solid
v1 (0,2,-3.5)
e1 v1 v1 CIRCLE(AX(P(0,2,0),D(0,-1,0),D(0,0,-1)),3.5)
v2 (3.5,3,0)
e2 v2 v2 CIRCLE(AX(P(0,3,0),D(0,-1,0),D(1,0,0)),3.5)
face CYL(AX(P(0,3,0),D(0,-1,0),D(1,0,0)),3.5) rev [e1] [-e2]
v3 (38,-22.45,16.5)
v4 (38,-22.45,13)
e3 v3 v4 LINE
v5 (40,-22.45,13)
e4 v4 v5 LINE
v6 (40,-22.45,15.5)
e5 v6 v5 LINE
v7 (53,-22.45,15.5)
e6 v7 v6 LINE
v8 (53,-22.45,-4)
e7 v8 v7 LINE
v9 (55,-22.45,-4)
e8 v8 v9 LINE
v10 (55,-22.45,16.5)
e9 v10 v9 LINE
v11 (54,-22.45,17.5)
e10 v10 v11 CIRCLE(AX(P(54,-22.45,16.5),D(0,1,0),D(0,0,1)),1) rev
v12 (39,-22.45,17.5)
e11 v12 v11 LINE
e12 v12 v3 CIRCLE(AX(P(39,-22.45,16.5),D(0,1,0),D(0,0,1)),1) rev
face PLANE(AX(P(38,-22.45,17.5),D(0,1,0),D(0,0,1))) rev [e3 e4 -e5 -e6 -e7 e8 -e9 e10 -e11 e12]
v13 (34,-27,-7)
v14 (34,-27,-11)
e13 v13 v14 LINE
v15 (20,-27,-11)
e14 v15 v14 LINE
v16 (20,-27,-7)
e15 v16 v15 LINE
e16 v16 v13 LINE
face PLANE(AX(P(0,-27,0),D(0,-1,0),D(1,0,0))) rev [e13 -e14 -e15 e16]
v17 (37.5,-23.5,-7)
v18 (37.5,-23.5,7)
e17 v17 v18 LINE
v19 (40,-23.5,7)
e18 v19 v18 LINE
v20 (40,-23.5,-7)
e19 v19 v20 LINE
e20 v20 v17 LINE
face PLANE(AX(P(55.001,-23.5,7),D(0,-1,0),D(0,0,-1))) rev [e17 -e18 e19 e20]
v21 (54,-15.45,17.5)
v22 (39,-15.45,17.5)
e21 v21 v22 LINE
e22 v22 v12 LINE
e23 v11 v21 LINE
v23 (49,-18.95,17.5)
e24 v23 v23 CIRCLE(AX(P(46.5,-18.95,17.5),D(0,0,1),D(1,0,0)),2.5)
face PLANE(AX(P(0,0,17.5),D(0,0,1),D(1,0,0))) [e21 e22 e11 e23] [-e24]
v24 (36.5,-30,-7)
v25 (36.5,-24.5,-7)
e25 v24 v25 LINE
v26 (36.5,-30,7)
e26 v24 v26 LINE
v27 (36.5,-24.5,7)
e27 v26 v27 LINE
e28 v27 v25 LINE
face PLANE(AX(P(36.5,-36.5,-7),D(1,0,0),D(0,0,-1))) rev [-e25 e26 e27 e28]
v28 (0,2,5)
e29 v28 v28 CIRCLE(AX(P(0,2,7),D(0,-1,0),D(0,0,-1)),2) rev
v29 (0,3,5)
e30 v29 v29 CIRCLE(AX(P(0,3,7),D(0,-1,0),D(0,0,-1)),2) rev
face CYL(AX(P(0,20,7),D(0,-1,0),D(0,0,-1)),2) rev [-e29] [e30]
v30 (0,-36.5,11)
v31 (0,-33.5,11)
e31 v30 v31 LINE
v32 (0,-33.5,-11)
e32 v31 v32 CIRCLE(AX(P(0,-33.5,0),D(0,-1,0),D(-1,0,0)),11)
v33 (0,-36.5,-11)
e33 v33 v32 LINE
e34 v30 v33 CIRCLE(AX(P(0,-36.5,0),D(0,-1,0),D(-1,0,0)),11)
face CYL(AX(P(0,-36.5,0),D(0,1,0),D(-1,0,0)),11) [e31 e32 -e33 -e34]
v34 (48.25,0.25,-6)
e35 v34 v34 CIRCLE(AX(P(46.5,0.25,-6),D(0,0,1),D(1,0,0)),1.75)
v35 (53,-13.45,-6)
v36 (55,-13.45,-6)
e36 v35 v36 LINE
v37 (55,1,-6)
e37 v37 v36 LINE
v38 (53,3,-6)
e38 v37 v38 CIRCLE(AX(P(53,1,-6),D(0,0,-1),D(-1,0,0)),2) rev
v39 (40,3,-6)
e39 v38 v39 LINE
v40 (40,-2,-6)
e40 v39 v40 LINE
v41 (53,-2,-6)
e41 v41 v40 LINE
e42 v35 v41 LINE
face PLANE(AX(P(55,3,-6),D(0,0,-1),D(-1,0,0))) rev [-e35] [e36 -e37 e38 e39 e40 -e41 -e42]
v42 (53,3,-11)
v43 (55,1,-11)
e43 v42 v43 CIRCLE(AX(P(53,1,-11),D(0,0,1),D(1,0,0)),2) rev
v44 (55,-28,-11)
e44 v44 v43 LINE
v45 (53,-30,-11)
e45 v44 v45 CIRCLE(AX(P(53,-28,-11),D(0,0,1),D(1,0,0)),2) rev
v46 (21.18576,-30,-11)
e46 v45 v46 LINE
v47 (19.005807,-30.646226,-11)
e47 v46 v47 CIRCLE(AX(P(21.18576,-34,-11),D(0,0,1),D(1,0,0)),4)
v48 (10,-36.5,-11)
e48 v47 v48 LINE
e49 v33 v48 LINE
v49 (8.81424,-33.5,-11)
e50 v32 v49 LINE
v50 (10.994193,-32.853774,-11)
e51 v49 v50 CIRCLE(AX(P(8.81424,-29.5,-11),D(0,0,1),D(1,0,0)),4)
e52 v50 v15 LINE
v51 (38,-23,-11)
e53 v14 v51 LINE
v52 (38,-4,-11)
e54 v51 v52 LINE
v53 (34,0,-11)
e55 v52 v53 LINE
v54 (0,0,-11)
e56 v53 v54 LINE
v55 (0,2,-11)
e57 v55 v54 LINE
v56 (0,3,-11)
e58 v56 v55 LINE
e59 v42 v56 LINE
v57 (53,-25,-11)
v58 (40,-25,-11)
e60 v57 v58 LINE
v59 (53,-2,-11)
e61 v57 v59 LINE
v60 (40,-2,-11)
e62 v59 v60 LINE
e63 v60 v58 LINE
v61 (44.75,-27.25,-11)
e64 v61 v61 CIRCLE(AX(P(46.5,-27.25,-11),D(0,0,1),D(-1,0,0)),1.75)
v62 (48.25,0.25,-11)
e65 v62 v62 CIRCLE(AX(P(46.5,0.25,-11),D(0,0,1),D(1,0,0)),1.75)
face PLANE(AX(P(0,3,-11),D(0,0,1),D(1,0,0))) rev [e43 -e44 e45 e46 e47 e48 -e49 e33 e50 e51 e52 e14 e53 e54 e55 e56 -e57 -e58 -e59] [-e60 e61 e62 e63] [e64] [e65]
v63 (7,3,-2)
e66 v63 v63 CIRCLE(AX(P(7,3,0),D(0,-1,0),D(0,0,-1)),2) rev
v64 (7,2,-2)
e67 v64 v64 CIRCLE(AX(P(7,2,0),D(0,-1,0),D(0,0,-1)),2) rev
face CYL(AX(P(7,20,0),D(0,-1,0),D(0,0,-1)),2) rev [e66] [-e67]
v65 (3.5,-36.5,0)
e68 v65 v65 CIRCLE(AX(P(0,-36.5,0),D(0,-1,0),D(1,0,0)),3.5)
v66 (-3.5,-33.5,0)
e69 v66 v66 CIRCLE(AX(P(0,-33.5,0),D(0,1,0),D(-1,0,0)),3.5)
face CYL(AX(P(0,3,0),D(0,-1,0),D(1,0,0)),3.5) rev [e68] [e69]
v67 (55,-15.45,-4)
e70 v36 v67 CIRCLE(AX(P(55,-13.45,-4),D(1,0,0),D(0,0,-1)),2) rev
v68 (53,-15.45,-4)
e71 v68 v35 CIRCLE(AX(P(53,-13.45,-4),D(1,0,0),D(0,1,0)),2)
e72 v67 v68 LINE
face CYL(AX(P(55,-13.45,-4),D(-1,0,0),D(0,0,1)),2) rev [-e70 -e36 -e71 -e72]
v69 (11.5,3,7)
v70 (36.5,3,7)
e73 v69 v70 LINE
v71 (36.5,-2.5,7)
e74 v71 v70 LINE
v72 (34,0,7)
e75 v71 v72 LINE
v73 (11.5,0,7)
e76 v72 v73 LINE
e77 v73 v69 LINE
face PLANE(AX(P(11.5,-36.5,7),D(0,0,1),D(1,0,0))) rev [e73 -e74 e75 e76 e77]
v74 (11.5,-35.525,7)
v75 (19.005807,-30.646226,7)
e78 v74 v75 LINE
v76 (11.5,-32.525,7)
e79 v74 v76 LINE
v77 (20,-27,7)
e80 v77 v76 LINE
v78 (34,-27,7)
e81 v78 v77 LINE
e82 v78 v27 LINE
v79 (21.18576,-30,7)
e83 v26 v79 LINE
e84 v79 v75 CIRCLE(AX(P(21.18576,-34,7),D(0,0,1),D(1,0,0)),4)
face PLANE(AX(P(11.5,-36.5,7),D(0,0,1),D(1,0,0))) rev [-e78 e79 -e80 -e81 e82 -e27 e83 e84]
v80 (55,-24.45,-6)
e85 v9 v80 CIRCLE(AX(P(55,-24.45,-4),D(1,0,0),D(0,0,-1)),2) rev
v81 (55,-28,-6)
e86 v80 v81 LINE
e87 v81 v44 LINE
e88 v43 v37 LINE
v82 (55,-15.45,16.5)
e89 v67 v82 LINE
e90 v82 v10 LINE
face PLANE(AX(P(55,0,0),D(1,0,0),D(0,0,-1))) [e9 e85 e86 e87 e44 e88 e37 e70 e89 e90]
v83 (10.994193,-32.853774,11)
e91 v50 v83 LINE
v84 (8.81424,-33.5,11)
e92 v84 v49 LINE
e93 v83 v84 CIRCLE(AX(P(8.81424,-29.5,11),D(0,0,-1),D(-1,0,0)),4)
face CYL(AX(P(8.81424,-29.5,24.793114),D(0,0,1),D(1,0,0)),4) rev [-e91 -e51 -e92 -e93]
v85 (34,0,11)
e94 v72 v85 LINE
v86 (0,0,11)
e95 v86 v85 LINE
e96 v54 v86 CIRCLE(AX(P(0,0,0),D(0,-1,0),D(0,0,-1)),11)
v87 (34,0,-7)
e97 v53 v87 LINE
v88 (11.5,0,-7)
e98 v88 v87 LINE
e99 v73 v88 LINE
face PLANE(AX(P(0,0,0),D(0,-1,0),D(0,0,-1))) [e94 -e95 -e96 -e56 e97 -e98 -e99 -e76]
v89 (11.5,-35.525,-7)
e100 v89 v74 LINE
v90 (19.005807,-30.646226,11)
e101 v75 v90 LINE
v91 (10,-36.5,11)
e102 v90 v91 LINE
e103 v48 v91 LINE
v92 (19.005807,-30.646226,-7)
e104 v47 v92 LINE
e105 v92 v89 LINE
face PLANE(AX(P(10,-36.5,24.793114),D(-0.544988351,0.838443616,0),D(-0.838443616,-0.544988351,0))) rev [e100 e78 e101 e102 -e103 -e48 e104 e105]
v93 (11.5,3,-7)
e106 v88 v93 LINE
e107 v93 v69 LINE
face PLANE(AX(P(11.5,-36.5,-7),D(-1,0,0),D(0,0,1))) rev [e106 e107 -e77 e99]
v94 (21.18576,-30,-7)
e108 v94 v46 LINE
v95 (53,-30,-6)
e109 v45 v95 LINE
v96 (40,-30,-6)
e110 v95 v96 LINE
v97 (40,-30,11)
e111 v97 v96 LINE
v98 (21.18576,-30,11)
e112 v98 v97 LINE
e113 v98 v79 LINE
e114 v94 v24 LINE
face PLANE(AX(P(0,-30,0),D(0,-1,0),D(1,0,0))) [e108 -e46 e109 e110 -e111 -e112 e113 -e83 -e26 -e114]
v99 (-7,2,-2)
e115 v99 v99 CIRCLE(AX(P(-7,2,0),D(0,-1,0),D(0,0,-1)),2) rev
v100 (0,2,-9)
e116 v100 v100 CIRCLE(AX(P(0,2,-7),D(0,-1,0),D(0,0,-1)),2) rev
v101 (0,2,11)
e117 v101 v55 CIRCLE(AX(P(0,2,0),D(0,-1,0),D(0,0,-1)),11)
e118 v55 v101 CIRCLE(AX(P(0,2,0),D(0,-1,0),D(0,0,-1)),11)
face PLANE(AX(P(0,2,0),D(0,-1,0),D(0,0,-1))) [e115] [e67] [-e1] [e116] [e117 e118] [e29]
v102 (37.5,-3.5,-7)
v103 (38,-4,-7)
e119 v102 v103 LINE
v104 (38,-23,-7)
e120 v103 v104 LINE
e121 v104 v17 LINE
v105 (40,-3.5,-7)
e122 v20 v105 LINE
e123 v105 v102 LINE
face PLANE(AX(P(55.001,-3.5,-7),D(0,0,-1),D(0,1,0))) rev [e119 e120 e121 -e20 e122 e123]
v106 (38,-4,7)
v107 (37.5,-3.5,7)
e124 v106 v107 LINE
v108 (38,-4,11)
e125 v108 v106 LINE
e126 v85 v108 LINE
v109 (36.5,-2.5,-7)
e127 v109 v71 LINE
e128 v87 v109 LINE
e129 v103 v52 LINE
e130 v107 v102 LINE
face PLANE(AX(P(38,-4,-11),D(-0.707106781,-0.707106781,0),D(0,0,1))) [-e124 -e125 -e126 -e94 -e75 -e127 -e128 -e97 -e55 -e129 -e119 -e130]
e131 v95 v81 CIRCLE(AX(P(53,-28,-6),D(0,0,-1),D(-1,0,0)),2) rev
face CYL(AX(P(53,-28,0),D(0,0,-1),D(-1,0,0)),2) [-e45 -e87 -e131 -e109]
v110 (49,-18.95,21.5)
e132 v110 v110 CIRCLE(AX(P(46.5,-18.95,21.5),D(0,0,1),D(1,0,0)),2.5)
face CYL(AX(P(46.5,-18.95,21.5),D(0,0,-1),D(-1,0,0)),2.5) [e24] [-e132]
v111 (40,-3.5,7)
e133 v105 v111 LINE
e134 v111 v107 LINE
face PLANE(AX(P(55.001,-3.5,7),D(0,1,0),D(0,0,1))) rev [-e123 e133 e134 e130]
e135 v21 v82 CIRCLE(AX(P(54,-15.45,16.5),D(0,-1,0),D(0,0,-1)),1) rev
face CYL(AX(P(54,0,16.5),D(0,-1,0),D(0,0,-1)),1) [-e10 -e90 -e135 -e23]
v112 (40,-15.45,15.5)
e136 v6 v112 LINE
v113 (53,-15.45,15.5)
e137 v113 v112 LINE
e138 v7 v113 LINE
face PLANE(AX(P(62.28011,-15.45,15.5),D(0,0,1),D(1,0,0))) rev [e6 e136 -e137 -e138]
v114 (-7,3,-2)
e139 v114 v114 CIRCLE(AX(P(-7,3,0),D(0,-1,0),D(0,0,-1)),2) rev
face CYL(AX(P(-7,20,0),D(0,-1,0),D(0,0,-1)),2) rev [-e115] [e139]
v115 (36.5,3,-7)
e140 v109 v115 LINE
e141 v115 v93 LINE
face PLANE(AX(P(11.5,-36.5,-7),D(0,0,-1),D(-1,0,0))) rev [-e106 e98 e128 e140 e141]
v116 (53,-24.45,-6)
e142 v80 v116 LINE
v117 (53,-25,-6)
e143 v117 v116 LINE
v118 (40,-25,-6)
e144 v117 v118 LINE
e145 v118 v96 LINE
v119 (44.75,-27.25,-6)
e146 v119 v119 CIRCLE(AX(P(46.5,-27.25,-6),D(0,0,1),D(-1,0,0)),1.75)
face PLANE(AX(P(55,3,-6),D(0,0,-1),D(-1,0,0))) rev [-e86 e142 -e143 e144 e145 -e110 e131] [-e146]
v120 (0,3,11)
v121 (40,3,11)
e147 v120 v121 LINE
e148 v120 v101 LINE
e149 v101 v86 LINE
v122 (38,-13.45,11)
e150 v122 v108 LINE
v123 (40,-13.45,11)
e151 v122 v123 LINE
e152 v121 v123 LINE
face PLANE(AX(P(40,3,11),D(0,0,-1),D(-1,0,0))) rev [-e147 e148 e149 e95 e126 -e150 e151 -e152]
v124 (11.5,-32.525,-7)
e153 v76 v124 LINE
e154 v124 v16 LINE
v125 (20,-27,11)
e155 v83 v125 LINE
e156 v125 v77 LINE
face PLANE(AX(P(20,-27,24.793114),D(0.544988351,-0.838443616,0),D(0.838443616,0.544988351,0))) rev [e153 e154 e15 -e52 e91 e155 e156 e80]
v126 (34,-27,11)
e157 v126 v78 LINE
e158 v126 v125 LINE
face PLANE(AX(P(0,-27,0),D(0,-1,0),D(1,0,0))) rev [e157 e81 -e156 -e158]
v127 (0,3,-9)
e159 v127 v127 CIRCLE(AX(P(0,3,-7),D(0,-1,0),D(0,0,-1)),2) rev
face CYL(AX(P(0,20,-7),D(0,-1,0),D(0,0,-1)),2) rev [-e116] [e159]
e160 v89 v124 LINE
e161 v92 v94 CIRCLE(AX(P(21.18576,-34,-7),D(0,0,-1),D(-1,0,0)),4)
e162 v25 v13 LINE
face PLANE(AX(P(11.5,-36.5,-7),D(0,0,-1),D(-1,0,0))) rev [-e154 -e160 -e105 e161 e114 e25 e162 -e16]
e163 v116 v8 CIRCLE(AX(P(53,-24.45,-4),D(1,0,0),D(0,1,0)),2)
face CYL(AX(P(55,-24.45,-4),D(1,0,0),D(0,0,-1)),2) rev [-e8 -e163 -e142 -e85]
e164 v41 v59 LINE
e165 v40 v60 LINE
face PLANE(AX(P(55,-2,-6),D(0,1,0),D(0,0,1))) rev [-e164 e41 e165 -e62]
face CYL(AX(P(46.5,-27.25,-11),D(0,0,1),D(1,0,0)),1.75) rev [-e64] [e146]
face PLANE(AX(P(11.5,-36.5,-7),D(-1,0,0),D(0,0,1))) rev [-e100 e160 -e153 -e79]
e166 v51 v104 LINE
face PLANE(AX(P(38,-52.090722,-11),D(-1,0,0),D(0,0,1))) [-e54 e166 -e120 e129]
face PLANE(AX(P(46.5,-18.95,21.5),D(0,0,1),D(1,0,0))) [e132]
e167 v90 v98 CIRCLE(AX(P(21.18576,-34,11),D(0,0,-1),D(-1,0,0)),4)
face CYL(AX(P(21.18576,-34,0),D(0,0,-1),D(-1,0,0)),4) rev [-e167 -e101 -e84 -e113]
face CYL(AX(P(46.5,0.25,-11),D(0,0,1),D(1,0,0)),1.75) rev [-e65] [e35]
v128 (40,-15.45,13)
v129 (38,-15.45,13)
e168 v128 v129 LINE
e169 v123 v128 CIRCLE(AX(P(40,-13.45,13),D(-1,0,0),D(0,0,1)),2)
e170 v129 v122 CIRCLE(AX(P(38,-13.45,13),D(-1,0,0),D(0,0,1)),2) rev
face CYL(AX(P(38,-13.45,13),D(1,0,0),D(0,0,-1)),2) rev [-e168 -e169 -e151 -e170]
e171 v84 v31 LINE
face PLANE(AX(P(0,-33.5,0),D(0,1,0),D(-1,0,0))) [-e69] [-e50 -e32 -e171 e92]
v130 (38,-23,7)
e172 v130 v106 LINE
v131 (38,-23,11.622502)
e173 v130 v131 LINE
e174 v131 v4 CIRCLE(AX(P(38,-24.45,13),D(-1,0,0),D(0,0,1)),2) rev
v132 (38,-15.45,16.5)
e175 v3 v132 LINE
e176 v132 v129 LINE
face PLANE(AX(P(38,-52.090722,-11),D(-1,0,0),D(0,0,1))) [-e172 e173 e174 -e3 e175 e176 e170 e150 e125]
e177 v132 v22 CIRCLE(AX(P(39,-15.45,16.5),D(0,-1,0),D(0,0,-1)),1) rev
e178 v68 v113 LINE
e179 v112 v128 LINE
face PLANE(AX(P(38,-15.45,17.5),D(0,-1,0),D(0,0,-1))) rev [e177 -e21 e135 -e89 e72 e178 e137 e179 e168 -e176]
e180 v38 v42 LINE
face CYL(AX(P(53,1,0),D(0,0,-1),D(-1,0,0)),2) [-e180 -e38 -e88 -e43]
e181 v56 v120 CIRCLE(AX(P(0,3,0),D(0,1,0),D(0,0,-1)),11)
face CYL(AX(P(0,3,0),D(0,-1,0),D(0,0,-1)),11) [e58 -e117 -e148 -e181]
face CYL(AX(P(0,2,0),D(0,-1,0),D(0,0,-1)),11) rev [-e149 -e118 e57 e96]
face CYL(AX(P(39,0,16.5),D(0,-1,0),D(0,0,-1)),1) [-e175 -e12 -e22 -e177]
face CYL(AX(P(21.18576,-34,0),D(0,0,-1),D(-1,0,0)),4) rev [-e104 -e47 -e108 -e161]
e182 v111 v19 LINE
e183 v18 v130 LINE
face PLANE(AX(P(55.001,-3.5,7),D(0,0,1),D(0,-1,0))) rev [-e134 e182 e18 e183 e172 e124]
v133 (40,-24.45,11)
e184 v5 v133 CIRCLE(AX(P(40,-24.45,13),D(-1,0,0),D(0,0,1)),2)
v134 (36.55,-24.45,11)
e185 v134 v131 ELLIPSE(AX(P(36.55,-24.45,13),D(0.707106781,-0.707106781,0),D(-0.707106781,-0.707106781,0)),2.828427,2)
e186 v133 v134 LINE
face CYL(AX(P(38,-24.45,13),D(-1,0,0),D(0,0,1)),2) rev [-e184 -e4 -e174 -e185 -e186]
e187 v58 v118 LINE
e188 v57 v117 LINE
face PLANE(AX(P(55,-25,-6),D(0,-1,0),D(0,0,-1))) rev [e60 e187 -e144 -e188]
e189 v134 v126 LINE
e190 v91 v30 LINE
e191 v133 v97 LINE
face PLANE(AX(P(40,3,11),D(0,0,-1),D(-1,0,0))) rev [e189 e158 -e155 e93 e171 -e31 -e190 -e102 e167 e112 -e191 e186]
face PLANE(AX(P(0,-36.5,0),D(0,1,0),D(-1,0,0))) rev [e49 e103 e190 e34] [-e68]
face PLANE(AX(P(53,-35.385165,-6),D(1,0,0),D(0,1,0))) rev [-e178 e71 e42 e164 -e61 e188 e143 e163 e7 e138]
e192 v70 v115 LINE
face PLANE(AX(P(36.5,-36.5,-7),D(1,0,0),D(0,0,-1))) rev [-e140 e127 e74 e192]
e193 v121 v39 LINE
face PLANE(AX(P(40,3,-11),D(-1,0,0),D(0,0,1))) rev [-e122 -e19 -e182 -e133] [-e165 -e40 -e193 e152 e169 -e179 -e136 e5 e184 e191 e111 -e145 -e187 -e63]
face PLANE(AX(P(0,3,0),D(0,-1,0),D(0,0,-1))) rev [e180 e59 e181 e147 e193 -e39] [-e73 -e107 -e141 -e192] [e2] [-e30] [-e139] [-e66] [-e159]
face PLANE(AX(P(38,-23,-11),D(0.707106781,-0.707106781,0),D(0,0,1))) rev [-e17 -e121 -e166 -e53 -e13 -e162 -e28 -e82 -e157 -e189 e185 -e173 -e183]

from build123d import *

# Parameters (mm, degrees)
EXTRUDE_1_DEPTH             = 3
SKETCH_3_R                  = 11
CUT_EXTRUDE_1_DEPTH         = 2
CUT_EXTRUDE_2_DEPTH         = 20
CUT_EXTRUDE_2_DEPTH_BACK    = 42.593268686
SKETCH_1_R                  = 3
SKETCH_1_R_2                = 2
EXTRUDE_2_DEPTH             = 3
SKETCH_5_R                  = 3.5
CUT_EXTRUDE_3_DEPTH         = 58.282196187
SKETCH_8_W                  = 20
SKETCH_8_H                  = 22
EXTRUDE_4_DEPTH             = 3
EXTRUDE_5_REACH             = 57.256
EXTRUDE_5_DIRECTION_2_REACH = 57.256
SKETCH_11_W                 = 5
SKETCH_11_H                 = 5
EXTRUDE_6_DEPTH             = 15
EXTRUDE_6_2_DEPTH           = 15
SKETCH_13_W                 = 2
SKETCH_13_H                 = 22
EXTRUDE_7_DEPTH             = 33
SKETCH_15_W                 = 2
SKETCH_15_H                 = 5
EXTRUDE_8_DEPTH             = 28
SKETCH_14_R                 = 1.75
CUT_EXTRUDE_4_DEPTH         = 69.163406605
SKETCH_16_W                 = 2
SKETCH_16_H                 = 7
EXTRUDE_9_DEPTH             = 6.5
SKETCH_17_W                 = 2
SKETCH_17_H                 = 7
EXTRUDE_10_DEPTH            = 15
SKETCH_18_W                 = 2
SKETCH_18_H                 = 7
EXTRUDE_11_DEPTH            = 21.5
SKETCH_19_R                 = 2.5
EXTRUDE_12_DEPTH            = 4
CUT_EXTRUDE_5_REACH         = 66.773
SKETCH_20_W                 = 14
SKETCH_20_H                 = 20
SKETCH_21_W                 = 25
SKETCH_21_H                 = 14
CUT_EXTRUDE_6_DEPTH         = 72.045759902
CHAMFER_1_SIZE              = 4
FILLET_1_R                  = 4
FILLET_2_R                  = 2
FILLET_3_R                  = 2
FILLET_4_R                  = 1


with BuildPart() as part:
    # 草图2 → 凸台-拉伸1 (new body)
    with BuildSketch(Plane(origin=(0, 0, 0), x_dir=(1, 0, 0), z_dir=(0, 1, 0))):
        with BuildLine():
            Line((0, 11), (40, 11))
            Line((40, 11), (40, -11))
            Line((40, -11), (0, -11))
            ThreePointArc((0, -11), (-11, 0), (0, 11))
        make_face()
    extrude(amount=EXTRUDE_1_DEPTH)

    # 草图3 → 切除-拉伸1 (cut)
    with BuildSketch(Plane(origin=(0, 0, 0), x_dir=(-1, 0, 0), z_dir=(0, -1, 0))):
        Circle(SKETCH_3_R)
    extrude(amount=-CUT_EXTRUDE_1_DEPTH, mode=Mode.SUBTRACT)

    # 草图1 → 切除-拉伸2 (cut, two sides: drawn at the far end of the back side and taken through both)
    with BuildSketch(Plane(origin=(0, 0, 0), x_dir=(1, 0, 0), z_dir=(0, 1, 0)).offset(-CUT_EXTRUDE_2_DEPTH_BACK)):
        with Locations(Location((0, 0, 0), (0, 0, 90))):
            Circle(SKETCH_1_R)
        with Locations(Location((-7, 0, 0), (0, 0, 90))):
            Circle(SKETCH_1_R_2)
        with Locations(Location((0, 7, 0), (0, 0, 90))):
            Circle(SKETCH_1_R_2)
        with Locations(Location((7, 0, 0), (0, 0, 90))):
            Circle(SKETCH_1_R_2)
        with Locations(Location((0, -7, 0), (0, 0, 90))):
            Circle(SKETCH_1_R_2)
    extrude(amount=CUT_EXTRUDE_2_DEPTH + CUT_EXTRUDE_2_DEPTH_BACK, mode=Mode.SUBTRACT)


with BuildPart() as body_2:
    # 草图4 → 凸台-拉伸2 (new body)
    with BuildSketch(Plane(origin=(0, -33.5, 0), x_dir=(-1, 0, 0), z_dir=(0, -1, 0))):
        with BuildLine():
            Line((0, 11), (-10, 11))
            Line((-10, 11), (-10, -11))
            Line((-10, -11), (0, -11))
            ThreePointArc((0, -11), (11, 0), (0, 11))
        make_face()
    extrude(amount=EXTRUDE_2_DEPTH)


with BuildPart() as cut_extrude_3_tool:
    # 草图5 → 切除-拉伸3 (new, through all)
    with BuildSketch(Plane(origin=(0, -36.5, 0), x_dir=(-1, 0, 0), z_dir=(0, -1, 0))):
        with Locations(Location((0, 0, 0), (0, 0, 180))):
            Circle(SKETCH_5_R)
    extrude(amount=-CUT_EXTRUDE_3_DEPTH)


with BuildPart() as part_1:
    add(part.part)

    # 切除-拉伸3: cut by cut_extrude_3_tool
    add(cut_extrude_3_tool.part, mode=Mode.SUBTRACT)



with BuildPart() as body_2_1:
    add(body_2.part)

    # 切除-拉伸3: cut by cut_extrude_3_tool
    add(cut_extrude_3_tool.part, mode=Mode.SUBTRACT)


with BuildPart() as body_3:
    # 草图8 → 凸台-拉伸4 (new body)
    with BuildSketch(Plane(origin=(0, -27, 0), x_dir=(-1, 0, 0), z_dir=(0, -1, 0))):
        with Locations((-30, 0)):
            Rectangle(SKETCH_8_W, SKETCH_8_H)
    extrude(amount=EXTRUDE_4_DEPTH)

    # 凸台-拉伸5: up to this face of the body (flat: up to its plane)
    extrude_5_end = Plane(body_3.part.faces().sort_by_distance((30, -28.5, 11))[0])
    # 草图10 → 凸台-拉伸5 (add, up to the picked face)
    with BuildSketch(Plane.XY, mode=Mode.PRIVATE) as extrude_5_sk1:
        Polygon((10, -36.5), (20, -30), (20, -27), (10, -33.5), align=None)
    extrude_5_tool1 = split(extrude(extrude_5_sk1.sketch, amount=EXTRUDE_5_REACH, mode=Mode.PRIVATE), bisect_by=extrude_5_end, keep=Keep.BOTH, mode=Mode.PRIVATE)

    add(body_2_1.part)  # 凸台-拉伸5 merges body 2
    add(extrude_5_tool1.solids().sort_by(Axis((15, -31.75, 0), (0, 0, 1)))[0])

    # 凸台-拉伸5 direction 2: up to this face of the body (flat: up to its plane)
    extrude_5_direction_2_end = Plane(body_3.part.faces().sort_by_distance((30, -28.5, -11))[0])
    # 草图10 → 凸台-拉伸5 direction 2 (add, up to the picked face)
    with BuildSketch(Plane.XY, mode=Mode.PRIVATE) as extrude_5_direction_2_sk1:
        Polygon((10, -36.5), (20, -30), (20, -27), (10, -33.5), align=None)
    extrude_5_direction_2_tool1 = split(extrude(extrude_5_direction_2_sk1.sketch, amount=-EXTRUDE_5_DIRECTION_2_REACH, mode=Mode.PRIVATE), bisect_by=extrude_5_direction_2_end, keep=Keep.BOTH, mode=Mode.PRIVATE)
    add(extrude_5_direction_2_tool1.solids().sort_by(Axis((15, -31.75, 0), (0, 0, -1)))[0])


with BuildPart() as body_3_2:
    # 草图11 → 凸台-拉伸6 (new body)
    with BuildSketch(Plane(origin=(40, 0, 0), x_dir=(0, 0, -1), z_dir=(1, 0, 0))):
        with Locations((8.5, 0.5)):
            Rectangle(SKETCH_11_W, SKETCH_11_H)
    extrude(amount=EXTRUDE_6_DEPTH)


with BuildPart() as body_4:
    # 草图11 → Extrude 6 2 (new body)
    with BuildSketch(Plane(origin=(40, 0, 0), x_dir=(0, 0, -1), z_dir=(1, 0, 0))):
        with Locations((8.5, -27.5)):
            Rectangle(SKETCH_11_W, SKETCH_11_H)
    extrude(amount=EXTRUDE_6_2_DEPTH)


with BuildPart() as part_2:
    add(part_1.part)

    add(body_3.part)  # 凸台-拉伸7 merges body 3

    add(body_3_2.part)  # 凸台-拉伸7 merges body 3 2

    add(body_4.part)  # 凸台-拉伸7 merges body 4
    # 草图13 → 凸台-拉伸7 (add)
    with BuildSketch(Plane(origin=(0, 3, 0), x_dir=(1, 0, 0), z_dir=(0, 1, 0))):
        with Locations((39, 0)):
            Rectangle(SKETCH_13_W, SKETCH_13_H)
    extrude(amount=-EXTRUDE_7_DEPTH)

    # 草图15 → 凸台-拉伸8 (add)
    with BuildSketch(Plane.XZ.offset(2)):
        with Locations((54, -8.5)):
            Rectangle(SKETCH_15_W, SKETCH_15_H)
    extrude(amount=EXTRUDE_8_DEPTH)

    # 草图14 → 切除-拉伸4 (cut, through all)
    with BuildSketch(Plane.XY.offset(-6)):
        with Locations((46.5, 0.25)):
            Circle(SKETCH_14_R)
        with Locations(Location((46.5, -27.25, 0), (0, 0, 180))):
            Circle(SKETCH_14_R)
    extrude(amount=-CUT_EXTRUDE_4_DEPTH, mode=Mode.SUBTRACT)

    # 草图16 → 凸台-拉伸9 (add)
    with BuildSketch(Plane.XY.offset(11)):
        with Locations((39, -18.95)):
            Rectangle(SKETCH_16_W, SKETCH_16_H)
    extrude(amount=EXTRUDE_9_DEPTH)

    # 草图17 → 凸台-拉伸10 (add)
    with BuildSketch(Plane(origin=(40, 0, 0), x_dir=(0, 0, -1), z_dir=(1, 0, 0))):
        with Locations((-16.5, -18.95)):
            Rectangle(SKETCH_17_W, SKETCH_17_H)
    extrude(amount=EXTRUDE_10_DEPTH)

    # 草图18 → 凸台-拉伸11 (add)
    with BuildSketch(Plane(origin=(0, 0, 15.5), x_dir=(-1, 0, 0), z_dir=(0, 0, -1))):
        with Locations((-54, -18.95)):
            Rectangle(SKETCH_18_W, SKETCH_18_H)
    extrude(amount=EXTRUDE_11_DEPTH)

    # 草图19 → 凸台-拉伸12 (add)
    with BuildSketch(Plane.XY.offset(17.5)):
        with Locations((46.5, -18.95)):
            Circle(SKETCH_19_R)
    extrude(amount=EXTRUDE_12_DEPTH)

    # 草图20 → 切除-拉伸5 (cut, up to next)
    with BuildSketch(Plane.ZY.offset(-38), mode=Mode.PRIVATE) as cut_extrude_5_sk1:
        with Locations((0, -13.5)):
            Rectangle(SKETCH_20_W, SKETCH_20_H)
    cut_extrude_5_tool1 = extrude(cut_extrude_5_sk1.sketch, amount=-CUT_EXTRUDE_5_REACH, mode=Mode.PRIVATE) & part_2.part
    add(cut_extrude_5_tool1.solids().sort_by_distance((38, -13.5, 0))[0], mode=Mode.SUBTRACT)

    # 草图21 → 切除-拉伸6 (cut, through all)
    with BuildSketch(Plane(origin=(0, 3, 0), x_dir=(1, 0, 0), z_dir=(0, 1, 0))):
        with Locations((24, 0)):
            Rectangle(SKETCH_21_W, SKETCH_21_H)
    extrude(amount=-CUT_EXTRUDE_6_DEPTH, mode=Mode.SUBTRACT)

    # 倒角1
    # the kernel refuses this chamfer: 4 mm, written as the material it adds along each edge
    with BuildSketch(Plane(origin=(38, -27, -11), x_dir=(-0.999621916911297, -0.027495876610579655, 0), z_dir=(0, 0, 1))) as chamfer_1_piece_1_section:
        Polygon((CHAMFER_1_SIZE * 0.999621916911, -CHAMFER_1_SIZE * 0.0274958766106), (-CHAMFER_1_SIZE * 0.0274958766106, -CHAMFER_1_SIZE * 0.999621916911), (0, 0), align=None)
    chamfer_1_piece_1 = extrude(amount=32.286731952, mode=Mode.PRIVATE)
    chamfer_1_piece_1 = split(chamfer_1_piece_1, bisect_by=Plane(origin=(35.666666667, -26.166666667, -7), z_dir=(0, 0, -1)), keep=Keep.TOP, mode=Mode.PRIVATE)
    add(chamfer_1_piece_1)
    with BuildSketch(Plane(origin=(38, -27, -11), x_dir=(-0.999621916911297, -0.027495876610579655, 0), z_dir=(0, 0, 1))) as chamfer_1_piece_2_section:
        Polygon((CHAMFER_1_SIZE * 0.999621916911, -CHAMFER_1_SIZE * 0.0274958766106), (-CHAMFER_1_SIZE * 0.0274958766106, -CHAMFER_1_SIZE * 0.999621916911), (0, 0), align=None)
    chamfer_1_piece_2 = extrude(amount=22, mode=Mode.PRIVATE)
    chamfer_1_piece_2 = split(chamfer_1_piece_2, bisect_by=Plane(origin=(36.5, -25.399122807, 0), z_dir=(1, 0, 0)), keep=Keep.TOP, mode=Mode.PRIVATE)
    chamfer_1_piece_2 = split(chamfer_1_piece_2, bisect_by=Plane(origin=(37.293859649, -23.5, 0), z_dir=(0, -1, 0)), keep=Keep.TOP, mode=Mode.PRIVATE)
    add(chamfer_1_piece_2)
    with BuildSketch(Plane(origin=(38, -27, -21.286731952), x_dir=(-0.999621916911297, -0.02749587661057961, 0), z_dir=(0, 0, 1))) as chamfer_1_piece_3_section:
        Polygon((CHAMFER_1_SIZE * 0.999621916911, -CHAMFER_1_SIZE * 0.0274958766106), (-CHAMFER_1_SIZE * 0.0274958766106, -CHAMFER_1_SIZE * 0.999621916911), (0, 0), align=None)
    chamfer_1_piece_3 = extrude(amount=32.286731952, mode=Mode.PRIVATE)
    chamfer_1_piece_3 = split(chamfer_1_piece_3, bisect_by=Plane(origin=(35.666666667, -26.166666667, 7), z_dir=(0, 0, 1)), keep=Keep.TOP, mode=Mode.PRIVATE)
    add(chamfer_1_piece_3)
    with BuildSketch(Plane(origin=(38, 0, 11), x_dir=(0.02749587661058563, -0.9996219169112968, 0), z_dir=(0, 0, -1))) as chamfer_1_piece_4_section:
        Polygon((CHAMFER_1_SIZE * 0.999621916911, CHAMFER_1_SIZE * 0.0274958766106), (-CHAMFER_1_SIZE * 0.0274958766106, CHAMFER_1_SIZE * 0.999621916911), (0, 0), align=None)
    chamfer_1_piece_4 = extrude(amount=32.286731952, mode=Mode.PRIVATE)
    chamfer_1_piece_4 = split(chamfer_1_piece_4, bisect_by=Plane(origin=(37.833333333, -3.666666667, 7), z_dir=(0, 0, 1)), keep=Keep.TOP, mode=Mode.PRIVATE)
    add(chamfer_1_piece_4)
    with BuildSketch(Plane(origin=(38, 0, 21.286731952), x_dir=(0.02749587661058563, -0.9996219169112968, 0), z_dir=(0, 0, -1))) as chamfer_1_piece_5_section:
        Polygon((CHAMFER_1_SIZE * 0.999621916911, CHAMFER_1_SIZE * 0.0274958766106), (-CHAMFER_1_SIZE * 0.0274958766106, CHAMFER_1_SIZE * 0.999621916911), (0, 0), align=None)
    chamfer_1_piece_5 = extrude(amount=32.286731952, mode=Mode.PRIVATE)
    chamfer_1_piece_5 = split(chamfer_1_piece_5, bisect_by=Plane(origin=(37.293859649, -1.600877193, 7), z_dir=(0, 0, -1)), keep=Keep.TOP, mode=Mode.PRIVATE)
    chamfer_1_piece_5 = split(chamfer_1_piece_5, bisect_by=Plane(origin=(37.293859649, -3.5, 0), z_dir=(0, 1, 0)), keep=Keep.TOP, mode=Mode.PRIVATE)
    chamfer_1_piece_5 = split(chamfer_1_piece_5, bisect_by=Plane(origin=(36.5, -1.600877193, 0), z_dir=(1, 0, 0)), keep=Keep.TOP, mode=Mode.PRIVATE)
    add(chamfer_1_piece_5)
    with BuildSketch(Plane(origin=(38, 0, 21.286731952), x_dir=(0.02749587661058563, -0.9996219169112968, 0), z_dir=(0, 0, -1))) as chamfer_1_piece_6_section:
        Polygon((CHAMFER_1_SIZE * 0.999621916911, CHAMFER_1_SIZE * 0.0274958766106), (-CHAMFER_1_SIZE * 0.0274958766106, CHAMFER_1_SIZE * 0.999621916911), (0, 0), align=None)
    chamfer_1_piece_6 = extrude(amount=32.286731952, mode=Mode.PRIVATE)
    chamfer_1_piece_6 = split(chamfer_1_piece_6, bisect_by=Plane(origin=(37.833333333, -3.666666667, -7), z_dir=(0, 0, -1)), keep=Keep.TOP, mode=Mode.PRIVATE)
    add(chamfer_1_piece_6)

    # 圆角1
    fillet_1_edges = [part_2.edges().sort_by_distance(p)[0] for p in [
        (20, -30, -9),
        (10, -33.5, 0),
        (20, -30, 9),
    ]]
    fillet(fillet_1_edges, radius=FILLET_1_R)

    # 圆角2
    fillet_2_edges = [part_2.edges().sort_by_distance(p)[0] for p in [
        (55, 3, -8.5),
        (55, -30, -8.5),
    ]]
    fillet(fillet_2_edges, radius=FILLET_2_R)

    # 圆角3
    fillet_3_edges = [part_2.edges().sort_by_distance(p)[0] for p in [
        (39, -22.45, 11),
        (39, -15.45, 11),
        (54, -15.45, -6),
        (54, -22.45, -6),
    ]]
    fillet(fillet_3_edges, radius=FILLET_3_R)

    # 圆角4
    fillet_4_edges = [part_2.edges().sort_by_distance(p)[0] for p in [
        (38, -18.95, 17.5),
        (55, -18.95, 17.5),
    ]]
    fillet(fillet_4_edges, radius=FILLET_4_R)


solid = part_2.part
